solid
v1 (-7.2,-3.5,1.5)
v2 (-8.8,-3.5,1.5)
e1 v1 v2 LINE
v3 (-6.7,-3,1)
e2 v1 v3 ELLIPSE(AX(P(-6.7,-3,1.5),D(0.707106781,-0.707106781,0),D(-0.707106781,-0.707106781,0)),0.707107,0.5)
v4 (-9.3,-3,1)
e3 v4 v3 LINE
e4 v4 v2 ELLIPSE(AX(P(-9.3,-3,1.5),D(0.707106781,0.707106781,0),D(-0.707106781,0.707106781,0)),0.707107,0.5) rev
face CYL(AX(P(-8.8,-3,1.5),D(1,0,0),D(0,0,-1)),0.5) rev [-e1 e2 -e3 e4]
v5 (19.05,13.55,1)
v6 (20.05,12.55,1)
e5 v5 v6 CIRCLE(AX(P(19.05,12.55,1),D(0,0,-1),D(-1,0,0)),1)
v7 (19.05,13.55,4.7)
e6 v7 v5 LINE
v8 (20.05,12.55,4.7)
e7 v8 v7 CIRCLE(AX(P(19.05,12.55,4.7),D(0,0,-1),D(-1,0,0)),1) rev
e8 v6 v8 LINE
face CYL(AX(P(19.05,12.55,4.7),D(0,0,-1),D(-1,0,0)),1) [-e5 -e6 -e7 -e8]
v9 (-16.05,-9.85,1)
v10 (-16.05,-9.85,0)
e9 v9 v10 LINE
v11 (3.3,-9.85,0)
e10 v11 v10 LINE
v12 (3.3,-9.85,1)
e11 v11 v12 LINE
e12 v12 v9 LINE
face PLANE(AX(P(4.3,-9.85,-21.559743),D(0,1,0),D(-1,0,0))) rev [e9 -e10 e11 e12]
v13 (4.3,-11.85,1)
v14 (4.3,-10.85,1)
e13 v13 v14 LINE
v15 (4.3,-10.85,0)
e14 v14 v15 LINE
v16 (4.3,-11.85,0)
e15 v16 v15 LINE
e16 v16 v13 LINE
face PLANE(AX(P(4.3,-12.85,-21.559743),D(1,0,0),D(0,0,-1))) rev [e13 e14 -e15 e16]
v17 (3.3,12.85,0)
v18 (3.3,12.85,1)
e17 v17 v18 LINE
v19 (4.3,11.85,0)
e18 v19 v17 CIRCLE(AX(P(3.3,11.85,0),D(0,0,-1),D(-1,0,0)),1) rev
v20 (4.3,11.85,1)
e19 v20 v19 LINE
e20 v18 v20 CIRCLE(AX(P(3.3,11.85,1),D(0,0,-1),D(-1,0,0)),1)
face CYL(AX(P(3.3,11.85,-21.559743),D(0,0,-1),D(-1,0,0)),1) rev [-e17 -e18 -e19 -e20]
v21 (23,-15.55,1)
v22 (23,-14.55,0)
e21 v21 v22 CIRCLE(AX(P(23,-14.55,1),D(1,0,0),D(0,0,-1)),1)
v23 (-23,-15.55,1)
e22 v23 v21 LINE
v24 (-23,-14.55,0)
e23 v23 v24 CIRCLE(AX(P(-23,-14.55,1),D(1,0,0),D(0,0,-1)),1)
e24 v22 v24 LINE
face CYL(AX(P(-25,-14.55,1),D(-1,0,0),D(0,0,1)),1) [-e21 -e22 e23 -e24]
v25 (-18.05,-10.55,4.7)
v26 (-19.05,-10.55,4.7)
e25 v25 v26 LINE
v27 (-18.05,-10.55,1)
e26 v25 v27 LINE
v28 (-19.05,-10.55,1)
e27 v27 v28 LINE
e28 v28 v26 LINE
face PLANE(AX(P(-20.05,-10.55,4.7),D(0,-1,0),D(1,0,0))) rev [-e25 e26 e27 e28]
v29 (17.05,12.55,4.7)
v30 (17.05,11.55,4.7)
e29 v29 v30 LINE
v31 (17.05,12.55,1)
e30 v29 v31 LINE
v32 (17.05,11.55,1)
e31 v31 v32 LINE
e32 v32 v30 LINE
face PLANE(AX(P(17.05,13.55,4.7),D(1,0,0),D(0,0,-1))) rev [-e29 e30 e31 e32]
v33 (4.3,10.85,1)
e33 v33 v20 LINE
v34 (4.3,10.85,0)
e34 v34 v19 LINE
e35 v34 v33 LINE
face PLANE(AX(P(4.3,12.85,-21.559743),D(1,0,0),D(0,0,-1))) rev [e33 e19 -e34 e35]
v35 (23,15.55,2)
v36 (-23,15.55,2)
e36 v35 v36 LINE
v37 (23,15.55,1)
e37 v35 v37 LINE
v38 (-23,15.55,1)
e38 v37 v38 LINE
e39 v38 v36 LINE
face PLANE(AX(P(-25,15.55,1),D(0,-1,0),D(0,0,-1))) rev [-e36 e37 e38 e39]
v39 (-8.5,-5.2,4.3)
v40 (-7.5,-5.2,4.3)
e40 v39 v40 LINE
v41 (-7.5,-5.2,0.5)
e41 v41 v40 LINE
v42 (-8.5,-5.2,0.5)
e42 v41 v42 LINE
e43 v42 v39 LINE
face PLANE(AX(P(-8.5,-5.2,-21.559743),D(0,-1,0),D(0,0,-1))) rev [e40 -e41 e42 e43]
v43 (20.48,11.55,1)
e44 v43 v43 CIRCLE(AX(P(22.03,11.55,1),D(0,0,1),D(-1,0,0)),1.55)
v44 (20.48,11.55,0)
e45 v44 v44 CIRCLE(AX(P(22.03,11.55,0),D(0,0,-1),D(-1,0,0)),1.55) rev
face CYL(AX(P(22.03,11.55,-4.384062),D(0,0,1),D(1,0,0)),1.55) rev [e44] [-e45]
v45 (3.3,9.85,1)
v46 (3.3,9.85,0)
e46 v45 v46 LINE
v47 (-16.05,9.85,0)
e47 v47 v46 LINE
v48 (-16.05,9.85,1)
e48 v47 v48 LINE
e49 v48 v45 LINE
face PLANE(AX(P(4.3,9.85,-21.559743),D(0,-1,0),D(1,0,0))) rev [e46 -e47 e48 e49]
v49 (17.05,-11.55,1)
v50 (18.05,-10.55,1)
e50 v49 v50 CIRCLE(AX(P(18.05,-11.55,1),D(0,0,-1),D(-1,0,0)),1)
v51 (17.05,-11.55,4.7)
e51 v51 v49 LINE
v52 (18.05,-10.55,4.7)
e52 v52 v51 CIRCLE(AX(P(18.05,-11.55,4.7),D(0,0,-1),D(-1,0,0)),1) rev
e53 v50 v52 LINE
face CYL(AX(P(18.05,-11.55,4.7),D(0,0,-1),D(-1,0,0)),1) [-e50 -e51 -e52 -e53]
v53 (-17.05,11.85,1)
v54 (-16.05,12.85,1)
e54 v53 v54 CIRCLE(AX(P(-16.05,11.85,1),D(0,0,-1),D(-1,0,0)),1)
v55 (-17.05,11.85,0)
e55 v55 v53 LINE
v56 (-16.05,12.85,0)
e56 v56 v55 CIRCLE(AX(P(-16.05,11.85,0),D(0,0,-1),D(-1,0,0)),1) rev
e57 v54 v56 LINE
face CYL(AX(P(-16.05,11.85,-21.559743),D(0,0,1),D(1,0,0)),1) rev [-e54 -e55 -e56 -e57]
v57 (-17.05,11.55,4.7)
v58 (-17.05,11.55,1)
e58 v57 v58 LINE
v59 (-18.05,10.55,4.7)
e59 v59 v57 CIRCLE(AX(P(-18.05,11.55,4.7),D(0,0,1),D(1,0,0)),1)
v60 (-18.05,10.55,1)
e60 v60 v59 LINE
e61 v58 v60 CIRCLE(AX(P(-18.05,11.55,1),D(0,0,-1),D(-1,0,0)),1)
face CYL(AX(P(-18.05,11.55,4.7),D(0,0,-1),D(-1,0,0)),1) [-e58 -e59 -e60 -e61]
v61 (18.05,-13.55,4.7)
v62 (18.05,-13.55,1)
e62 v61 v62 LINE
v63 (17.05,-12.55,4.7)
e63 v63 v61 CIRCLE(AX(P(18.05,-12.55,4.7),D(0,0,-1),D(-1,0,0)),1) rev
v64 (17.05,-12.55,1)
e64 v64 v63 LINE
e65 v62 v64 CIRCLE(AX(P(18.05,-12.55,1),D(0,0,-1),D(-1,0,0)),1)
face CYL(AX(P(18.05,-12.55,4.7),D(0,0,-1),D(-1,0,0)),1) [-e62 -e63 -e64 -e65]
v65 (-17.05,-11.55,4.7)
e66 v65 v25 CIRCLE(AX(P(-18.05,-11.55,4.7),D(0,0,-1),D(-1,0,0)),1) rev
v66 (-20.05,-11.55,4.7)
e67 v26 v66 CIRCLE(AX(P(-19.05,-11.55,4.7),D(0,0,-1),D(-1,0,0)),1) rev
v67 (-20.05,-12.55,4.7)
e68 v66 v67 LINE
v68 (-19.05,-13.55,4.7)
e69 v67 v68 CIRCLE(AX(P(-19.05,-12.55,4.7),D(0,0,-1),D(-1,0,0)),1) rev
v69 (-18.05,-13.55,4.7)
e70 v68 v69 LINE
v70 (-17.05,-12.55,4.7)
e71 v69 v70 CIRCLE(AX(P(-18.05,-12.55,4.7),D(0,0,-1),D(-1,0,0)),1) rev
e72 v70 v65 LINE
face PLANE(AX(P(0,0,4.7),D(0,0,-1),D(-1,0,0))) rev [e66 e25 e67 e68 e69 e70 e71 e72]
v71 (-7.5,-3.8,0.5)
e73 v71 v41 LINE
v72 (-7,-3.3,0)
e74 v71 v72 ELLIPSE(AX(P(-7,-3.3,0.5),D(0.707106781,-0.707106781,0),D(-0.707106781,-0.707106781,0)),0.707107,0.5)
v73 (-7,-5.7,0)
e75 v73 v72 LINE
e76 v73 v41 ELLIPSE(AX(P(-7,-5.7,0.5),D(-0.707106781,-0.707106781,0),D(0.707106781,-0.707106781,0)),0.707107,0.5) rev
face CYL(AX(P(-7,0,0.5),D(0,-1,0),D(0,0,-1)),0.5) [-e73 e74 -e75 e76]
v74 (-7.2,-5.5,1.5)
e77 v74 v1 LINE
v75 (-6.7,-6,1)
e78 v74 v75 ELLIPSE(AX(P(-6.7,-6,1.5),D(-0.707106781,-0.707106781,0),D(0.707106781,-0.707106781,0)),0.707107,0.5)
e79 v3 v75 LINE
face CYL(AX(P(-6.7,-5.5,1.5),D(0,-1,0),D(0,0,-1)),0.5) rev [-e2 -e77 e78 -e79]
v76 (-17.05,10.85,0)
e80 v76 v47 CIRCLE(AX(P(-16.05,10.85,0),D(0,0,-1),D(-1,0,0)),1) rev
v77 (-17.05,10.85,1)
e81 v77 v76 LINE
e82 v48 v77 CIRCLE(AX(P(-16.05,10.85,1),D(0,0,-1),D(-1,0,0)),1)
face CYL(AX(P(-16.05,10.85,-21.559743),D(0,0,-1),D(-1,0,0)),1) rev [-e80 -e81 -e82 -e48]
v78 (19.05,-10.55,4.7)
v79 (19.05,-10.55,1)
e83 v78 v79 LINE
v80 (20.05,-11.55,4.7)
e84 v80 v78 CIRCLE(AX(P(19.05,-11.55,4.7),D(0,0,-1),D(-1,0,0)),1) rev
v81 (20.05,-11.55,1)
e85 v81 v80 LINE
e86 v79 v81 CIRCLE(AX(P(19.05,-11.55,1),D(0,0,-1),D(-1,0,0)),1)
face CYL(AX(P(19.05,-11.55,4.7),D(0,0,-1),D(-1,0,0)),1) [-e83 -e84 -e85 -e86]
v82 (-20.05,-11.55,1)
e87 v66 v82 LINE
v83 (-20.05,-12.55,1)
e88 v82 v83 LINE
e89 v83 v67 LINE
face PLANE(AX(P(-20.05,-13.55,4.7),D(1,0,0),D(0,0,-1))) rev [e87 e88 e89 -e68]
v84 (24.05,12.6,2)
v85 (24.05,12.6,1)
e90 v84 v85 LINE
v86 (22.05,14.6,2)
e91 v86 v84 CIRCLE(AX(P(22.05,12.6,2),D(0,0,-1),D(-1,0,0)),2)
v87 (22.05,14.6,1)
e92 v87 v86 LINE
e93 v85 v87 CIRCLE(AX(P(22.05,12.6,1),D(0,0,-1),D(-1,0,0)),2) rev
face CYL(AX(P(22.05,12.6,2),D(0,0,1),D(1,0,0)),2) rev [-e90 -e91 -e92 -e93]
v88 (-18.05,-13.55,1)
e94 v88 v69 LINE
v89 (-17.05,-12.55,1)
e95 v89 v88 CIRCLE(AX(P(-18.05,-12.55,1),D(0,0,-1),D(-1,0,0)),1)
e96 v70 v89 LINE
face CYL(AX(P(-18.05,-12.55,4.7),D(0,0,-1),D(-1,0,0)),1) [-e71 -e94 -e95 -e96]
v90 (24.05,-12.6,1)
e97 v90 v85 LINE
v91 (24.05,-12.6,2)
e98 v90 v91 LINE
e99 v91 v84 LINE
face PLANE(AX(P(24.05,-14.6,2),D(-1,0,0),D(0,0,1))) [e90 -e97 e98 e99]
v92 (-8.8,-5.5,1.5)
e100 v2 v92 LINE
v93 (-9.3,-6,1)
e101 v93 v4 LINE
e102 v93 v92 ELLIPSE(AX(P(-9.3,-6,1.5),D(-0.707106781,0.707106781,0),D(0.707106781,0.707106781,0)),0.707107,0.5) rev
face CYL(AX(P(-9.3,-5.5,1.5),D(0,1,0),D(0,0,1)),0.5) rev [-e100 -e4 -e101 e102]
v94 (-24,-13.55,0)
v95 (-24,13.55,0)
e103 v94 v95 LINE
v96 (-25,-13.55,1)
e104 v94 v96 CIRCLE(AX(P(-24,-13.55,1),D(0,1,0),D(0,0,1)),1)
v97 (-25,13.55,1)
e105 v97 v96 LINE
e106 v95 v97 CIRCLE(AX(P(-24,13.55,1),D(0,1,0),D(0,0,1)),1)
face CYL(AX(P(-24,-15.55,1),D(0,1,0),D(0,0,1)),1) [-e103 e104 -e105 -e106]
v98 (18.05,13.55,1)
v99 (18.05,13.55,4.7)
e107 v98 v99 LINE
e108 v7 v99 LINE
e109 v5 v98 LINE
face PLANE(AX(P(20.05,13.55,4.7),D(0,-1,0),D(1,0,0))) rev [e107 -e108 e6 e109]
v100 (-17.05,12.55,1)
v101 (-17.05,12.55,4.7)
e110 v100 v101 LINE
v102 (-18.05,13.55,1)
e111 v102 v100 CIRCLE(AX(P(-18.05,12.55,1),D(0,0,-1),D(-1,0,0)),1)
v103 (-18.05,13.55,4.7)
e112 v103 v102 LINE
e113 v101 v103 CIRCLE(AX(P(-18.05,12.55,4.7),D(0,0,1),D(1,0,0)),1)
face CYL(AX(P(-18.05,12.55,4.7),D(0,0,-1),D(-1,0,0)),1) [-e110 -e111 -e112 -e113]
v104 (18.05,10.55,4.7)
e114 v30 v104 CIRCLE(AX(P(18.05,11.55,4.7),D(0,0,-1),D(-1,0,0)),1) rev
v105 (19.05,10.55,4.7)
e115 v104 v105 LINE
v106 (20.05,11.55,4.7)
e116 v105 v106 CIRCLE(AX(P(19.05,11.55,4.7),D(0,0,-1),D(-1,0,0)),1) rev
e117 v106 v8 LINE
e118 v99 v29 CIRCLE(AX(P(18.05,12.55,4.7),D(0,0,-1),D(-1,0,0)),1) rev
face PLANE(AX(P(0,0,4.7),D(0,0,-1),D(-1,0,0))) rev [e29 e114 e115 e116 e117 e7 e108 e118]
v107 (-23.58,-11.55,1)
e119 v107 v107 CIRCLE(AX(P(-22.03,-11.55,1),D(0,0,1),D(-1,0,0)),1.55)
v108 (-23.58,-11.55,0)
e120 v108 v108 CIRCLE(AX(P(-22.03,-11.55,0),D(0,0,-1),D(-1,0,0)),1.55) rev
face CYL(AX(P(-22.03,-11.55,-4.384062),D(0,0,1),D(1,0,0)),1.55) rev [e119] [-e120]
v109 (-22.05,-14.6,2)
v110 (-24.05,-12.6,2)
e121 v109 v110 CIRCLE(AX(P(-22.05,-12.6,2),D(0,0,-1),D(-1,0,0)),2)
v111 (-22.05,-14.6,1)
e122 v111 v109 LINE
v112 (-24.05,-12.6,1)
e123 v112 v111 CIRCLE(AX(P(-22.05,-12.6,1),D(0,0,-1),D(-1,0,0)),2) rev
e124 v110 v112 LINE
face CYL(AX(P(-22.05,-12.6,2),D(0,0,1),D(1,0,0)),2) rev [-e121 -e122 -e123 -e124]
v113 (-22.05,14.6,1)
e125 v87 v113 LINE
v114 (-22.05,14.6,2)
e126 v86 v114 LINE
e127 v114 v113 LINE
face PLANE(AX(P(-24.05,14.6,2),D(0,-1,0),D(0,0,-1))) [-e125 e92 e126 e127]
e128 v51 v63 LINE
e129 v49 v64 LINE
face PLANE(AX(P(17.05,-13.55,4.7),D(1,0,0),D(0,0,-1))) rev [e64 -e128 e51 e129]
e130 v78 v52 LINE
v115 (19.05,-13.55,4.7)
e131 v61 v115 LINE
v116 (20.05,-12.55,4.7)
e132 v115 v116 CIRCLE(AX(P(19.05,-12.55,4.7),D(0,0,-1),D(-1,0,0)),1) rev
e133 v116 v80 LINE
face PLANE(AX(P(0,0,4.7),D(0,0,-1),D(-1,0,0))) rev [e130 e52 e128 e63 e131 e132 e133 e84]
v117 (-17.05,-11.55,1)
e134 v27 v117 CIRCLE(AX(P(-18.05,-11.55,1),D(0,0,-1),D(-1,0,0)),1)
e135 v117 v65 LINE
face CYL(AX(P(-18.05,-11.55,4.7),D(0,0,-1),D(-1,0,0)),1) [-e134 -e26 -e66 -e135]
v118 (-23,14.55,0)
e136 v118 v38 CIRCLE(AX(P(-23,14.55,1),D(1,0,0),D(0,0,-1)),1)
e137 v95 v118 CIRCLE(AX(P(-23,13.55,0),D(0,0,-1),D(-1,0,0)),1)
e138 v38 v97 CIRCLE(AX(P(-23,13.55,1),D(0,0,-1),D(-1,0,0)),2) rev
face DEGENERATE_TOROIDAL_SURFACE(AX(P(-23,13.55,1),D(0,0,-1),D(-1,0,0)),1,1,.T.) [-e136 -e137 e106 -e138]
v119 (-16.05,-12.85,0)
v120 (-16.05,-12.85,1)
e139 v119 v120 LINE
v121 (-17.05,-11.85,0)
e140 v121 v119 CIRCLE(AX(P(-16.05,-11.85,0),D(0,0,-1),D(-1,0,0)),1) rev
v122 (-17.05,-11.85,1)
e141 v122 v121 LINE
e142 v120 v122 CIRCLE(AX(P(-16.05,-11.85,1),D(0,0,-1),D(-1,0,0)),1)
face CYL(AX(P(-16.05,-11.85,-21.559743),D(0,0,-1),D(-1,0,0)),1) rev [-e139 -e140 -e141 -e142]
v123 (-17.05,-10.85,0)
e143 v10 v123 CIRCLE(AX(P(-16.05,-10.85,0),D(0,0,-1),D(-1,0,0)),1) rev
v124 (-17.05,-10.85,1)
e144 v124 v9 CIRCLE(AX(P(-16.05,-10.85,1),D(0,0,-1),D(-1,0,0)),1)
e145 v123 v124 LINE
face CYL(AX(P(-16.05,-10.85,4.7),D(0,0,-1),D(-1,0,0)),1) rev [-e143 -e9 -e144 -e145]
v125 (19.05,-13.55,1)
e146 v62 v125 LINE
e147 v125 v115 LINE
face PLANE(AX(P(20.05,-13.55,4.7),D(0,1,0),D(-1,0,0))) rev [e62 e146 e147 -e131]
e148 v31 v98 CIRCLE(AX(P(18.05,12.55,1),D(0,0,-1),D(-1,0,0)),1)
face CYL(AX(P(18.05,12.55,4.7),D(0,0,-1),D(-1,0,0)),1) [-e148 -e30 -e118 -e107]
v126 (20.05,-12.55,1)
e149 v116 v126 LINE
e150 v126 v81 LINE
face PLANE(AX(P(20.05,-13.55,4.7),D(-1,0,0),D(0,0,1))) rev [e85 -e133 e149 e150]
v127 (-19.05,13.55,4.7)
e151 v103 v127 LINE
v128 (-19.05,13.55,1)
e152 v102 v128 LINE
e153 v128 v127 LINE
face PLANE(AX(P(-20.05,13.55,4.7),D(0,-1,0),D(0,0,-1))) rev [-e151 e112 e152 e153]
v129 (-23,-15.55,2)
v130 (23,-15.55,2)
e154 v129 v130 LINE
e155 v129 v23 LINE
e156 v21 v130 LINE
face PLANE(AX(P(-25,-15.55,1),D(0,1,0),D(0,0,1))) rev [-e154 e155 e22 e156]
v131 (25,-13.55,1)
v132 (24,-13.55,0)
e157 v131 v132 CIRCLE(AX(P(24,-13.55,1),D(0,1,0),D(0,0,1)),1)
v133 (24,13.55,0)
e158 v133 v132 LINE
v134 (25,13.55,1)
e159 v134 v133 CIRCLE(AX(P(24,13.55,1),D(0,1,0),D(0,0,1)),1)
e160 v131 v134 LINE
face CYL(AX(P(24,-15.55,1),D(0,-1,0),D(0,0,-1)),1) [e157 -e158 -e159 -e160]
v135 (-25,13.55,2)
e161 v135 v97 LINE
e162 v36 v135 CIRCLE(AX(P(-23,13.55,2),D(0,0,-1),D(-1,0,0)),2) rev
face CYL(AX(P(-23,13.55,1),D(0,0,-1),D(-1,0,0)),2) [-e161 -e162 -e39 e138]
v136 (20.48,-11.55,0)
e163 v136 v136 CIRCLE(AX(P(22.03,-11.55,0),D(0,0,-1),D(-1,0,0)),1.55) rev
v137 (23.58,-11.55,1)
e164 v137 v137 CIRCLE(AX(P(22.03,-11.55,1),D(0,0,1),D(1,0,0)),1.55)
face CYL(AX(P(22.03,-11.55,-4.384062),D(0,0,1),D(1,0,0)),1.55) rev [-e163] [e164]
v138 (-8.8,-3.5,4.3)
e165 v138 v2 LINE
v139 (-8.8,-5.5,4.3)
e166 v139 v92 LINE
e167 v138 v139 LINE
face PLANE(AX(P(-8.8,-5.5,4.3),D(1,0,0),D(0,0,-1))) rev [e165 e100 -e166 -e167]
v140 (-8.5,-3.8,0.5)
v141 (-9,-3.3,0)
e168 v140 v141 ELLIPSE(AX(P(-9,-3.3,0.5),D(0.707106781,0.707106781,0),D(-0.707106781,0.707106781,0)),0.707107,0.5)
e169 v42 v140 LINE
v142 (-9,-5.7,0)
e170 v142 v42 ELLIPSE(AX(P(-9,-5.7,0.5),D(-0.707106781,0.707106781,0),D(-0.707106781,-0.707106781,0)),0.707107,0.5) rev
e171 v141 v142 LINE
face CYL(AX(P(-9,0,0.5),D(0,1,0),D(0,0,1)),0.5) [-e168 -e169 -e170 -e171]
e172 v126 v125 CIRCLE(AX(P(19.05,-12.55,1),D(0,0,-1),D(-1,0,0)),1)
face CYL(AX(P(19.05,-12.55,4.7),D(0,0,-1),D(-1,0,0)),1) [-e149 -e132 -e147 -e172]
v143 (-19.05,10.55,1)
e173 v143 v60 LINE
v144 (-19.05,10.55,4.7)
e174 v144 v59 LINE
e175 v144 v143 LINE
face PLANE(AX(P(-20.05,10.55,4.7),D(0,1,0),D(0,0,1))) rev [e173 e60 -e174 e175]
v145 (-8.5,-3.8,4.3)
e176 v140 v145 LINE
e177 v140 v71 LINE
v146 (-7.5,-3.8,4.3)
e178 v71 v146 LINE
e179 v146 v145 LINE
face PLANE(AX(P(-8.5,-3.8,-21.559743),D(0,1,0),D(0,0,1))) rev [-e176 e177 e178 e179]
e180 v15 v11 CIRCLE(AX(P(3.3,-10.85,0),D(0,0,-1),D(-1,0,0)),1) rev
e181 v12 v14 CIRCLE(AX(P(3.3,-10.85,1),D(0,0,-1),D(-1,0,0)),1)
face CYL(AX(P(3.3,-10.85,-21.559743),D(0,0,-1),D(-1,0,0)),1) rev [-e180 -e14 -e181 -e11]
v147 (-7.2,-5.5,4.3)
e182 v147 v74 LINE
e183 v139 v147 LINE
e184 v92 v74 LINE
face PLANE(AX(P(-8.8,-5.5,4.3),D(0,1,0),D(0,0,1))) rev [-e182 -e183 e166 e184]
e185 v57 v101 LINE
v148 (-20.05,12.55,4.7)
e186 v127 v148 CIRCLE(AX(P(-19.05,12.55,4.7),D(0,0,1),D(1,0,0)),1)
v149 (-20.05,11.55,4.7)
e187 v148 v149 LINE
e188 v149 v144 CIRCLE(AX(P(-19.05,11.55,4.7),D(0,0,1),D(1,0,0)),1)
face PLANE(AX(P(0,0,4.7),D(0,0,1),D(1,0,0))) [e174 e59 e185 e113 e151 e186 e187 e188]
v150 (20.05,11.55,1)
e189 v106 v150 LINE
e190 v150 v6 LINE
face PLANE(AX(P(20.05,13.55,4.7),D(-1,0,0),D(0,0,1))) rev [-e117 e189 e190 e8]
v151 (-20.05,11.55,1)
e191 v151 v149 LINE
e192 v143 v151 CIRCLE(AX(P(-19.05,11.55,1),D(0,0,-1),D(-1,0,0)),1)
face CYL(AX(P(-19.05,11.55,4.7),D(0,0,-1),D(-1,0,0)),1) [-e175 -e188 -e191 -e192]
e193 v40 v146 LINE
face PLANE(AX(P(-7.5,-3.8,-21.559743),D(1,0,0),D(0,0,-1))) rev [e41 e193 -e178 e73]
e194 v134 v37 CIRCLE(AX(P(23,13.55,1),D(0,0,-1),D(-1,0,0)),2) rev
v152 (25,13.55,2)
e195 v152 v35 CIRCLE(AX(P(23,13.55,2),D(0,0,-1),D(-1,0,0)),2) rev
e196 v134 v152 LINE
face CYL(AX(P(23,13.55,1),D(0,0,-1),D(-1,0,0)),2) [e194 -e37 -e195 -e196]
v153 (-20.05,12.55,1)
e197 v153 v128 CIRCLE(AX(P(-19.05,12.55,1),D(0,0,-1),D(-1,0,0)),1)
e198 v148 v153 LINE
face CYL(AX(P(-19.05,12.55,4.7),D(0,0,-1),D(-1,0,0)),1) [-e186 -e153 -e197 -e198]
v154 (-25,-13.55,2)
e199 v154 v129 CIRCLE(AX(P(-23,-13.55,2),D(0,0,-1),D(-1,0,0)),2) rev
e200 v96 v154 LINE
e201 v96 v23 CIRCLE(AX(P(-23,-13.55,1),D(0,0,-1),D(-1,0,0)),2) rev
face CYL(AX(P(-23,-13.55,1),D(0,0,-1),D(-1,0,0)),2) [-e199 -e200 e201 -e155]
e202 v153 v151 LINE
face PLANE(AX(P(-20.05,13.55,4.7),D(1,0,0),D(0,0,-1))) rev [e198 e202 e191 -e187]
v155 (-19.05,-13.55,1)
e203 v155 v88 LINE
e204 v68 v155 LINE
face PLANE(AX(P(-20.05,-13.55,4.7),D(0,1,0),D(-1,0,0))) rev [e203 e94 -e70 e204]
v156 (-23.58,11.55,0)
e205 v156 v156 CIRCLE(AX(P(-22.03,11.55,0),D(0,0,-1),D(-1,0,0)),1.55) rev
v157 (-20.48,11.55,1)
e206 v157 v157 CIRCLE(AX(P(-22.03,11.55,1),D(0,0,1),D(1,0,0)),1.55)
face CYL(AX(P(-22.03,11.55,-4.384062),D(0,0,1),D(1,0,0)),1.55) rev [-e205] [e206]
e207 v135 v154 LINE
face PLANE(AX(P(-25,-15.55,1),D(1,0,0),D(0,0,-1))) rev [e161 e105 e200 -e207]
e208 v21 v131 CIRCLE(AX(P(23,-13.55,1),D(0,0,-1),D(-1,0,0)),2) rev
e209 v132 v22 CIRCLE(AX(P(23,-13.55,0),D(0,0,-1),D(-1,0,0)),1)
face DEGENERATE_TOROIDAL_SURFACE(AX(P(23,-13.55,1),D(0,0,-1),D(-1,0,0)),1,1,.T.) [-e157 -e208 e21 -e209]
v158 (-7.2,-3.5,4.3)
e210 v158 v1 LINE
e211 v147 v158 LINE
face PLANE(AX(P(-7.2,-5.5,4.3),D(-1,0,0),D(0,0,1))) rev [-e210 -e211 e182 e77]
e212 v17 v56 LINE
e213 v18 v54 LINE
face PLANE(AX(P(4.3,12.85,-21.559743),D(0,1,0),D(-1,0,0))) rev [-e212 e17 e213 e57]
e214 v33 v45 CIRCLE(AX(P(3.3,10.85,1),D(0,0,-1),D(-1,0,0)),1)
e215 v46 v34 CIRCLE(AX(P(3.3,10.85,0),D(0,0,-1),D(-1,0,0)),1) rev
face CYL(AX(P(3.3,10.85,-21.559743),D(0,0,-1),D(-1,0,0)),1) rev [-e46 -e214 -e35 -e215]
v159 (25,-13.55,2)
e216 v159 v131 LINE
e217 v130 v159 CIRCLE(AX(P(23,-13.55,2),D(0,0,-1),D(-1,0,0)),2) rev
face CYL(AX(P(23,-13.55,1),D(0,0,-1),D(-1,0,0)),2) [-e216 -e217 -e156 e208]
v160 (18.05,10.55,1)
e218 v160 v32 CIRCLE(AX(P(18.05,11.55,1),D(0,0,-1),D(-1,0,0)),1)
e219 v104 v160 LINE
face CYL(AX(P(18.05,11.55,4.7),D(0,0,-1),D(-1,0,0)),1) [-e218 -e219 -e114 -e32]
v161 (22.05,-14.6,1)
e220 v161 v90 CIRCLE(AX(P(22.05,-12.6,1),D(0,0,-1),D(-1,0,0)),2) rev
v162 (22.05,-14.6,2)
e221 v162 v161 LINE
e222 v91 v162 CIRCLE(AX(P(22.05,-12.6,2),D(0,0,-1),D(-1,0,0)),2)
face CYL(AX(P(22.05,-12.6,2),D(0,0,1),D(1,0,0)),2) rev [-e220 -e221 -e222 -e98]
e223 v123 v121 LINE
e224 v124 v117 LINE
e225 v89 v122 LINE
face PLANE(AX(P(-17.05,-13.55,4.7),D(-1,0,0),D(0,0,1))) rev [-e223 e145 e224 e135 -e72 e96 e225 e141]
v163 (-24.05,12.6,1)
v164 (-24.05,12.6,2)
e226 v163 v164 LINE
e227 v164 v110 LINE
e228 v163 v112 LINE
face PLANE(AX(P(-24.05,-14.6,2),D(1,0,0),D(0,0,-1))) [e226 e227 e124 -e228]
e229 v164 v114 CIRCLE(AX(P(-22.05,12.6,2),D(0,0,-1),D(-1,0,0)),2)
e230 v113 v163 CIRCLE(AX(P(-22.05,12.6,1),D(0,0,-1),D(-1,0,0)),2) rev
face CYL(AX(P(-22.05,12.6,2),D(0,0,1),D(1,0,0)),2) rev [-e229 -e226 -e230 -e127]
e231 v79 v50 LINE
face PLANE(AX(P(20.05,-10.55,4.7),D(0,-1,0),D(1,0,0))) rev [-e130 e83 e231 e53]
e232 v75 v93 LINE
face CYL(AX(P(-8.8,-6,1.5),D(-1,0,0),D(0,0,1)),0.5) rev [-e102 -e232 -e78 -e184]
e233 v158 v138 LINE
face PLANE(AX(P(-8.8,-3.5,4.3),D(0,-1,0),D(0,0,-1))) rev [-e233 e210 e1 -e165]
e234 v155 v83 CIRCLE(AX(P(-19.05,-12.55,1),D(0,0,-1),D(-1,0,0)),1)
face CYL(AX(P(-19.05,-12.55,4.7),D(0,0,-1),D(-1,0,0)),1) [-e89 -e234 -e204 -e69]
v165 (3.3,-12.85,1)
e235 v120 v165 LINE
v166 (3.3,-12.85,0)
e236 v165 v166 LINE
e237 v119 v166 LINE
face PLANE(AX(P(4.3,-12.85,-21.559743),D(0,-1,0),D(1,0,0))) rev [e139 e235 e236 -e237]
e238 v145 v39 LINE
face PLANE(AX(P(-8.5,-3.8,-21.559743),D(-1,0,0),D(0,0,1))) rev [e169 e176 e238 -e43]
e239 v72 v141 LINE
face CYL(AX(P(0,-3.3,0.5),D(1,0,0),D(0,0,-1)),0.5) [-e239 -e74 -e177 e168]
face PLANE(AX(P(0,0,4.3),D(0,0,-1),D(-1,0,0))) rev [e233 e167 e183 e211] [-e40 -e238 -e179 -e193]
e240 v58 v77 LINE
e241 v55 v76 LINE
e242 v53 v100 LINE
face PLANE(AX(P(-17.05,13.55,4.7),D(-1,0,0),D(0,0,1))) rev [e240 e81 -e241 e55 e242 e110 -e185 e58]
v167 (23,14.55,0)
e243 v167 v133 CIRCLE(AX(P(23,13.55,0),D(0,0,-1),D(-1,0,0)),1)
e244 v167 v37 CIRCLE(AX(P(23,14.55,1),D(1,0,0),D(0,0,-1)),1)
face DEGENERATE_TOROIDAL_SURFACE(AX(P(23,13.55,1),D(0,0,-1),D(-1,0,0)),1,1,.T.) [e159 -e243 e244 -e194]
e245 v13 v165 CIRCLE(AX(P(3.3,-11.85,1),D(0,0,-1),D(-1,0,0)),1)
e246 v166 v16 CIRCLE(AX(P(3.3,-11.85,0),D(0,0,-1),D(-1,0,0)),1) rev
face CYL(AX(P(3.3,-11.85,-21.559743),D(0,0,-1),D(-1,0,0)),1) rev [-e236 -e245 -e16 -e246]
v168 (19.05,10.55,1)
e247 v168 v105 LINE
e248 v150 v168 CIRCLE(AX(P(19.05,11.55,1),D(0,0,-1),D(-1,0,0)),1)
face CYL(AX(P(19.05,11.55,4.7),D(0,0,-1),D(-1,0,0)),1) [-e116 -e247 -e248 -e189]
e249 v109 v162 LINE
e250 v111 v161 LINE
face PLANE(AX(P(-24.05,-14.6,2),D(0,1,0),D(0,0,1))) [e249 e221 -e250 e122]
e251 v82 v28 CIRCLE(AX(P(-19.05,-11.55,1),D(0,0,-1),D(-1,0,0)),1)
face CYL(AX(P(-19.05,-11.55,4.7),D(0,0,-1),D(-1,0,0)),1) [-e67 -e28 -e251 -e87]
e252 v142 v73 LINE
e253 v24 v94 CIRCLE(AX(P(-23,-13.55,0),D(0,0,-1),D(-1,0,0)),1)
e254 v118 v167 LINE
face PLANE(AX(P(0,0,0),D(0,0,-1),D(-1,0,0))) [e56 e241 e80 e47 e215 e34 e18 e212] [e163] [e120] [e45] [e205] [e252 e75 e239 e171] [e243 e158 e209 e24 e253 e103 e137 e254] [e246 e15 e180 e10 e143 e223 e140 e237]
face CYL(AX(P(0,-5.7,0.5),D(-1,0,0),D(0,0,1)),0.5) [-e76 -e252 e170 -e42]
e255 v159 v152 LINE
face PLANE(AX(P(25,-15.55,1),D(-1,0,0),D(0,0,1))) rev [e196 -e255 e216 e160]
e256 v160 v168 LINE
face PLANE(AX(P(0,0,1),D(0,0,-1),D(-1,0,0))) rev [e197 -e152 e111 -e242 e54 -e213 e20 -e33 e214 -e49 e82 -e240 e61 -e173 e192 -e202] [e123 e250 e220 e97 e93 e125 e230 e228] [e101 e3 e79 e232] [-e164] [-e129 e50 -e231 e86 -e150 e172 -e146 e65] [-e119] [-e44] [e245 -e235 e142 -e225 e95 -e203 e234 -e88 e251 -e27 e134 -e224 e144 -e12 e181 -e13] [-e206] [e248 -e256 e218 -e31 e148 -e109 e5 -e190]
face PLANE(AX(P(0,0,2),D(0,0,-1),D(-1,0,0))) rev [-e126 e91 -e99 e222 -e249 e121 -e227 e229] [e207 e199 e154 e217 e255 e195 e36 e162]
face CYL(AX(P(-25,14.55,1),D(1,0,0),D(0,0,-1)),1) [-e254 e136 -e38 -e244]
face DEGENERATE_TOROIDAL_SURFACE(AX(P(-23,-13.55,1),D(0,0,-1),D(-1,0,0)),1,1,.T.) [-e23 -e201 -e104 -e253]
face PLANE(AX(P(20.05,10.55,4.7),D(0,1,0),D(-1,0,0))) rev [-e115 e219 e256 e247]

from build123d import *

# Parameters (mm, degrees)
SKETCH1_W           = 50
SKETCH1_H           = 31.1
BOSS_EXTRUDE1_DEPTH = 1
SKETCH2_W           = 50
SKETCH2_H           = 31.1
SKETCH2_W_2         = 48.1
SKETCH2_H_2         = 29.2
BOSS_EXTRUDE2_DEPTH = 1
SKETCH3_W           = 3
SKETCH3_H           = 3
BOSS_EXTRUDE3_DEPTH = 3.7
SKETCH4_R           = 1.55
CUT_EXTRUDE1_DEPTH  = 1
SKETCH5_W           = 21.35
SKETCH5_H           = 3
SKETCH5_W_2         = 1
SKETCH5_H_2         = 1.4
CUT_EXTRUDE2_DEPTH  = 1
SKETCH6_W           = 1.6
SKETCH6_H           = 2
SKETCH6_W_2         = 1
SKETCH6_H_2         = 1.4
BOSS_EXTRUDE4_DEPTH = 3.3
FILLET1_R           = 2
FILLET2_R           = 1
FILLET3_R           = 1
FILLET4_R           = 1
FILLET5_R           = 0.5
FILLET6_R           = 0.5


with BuildPart() as part:
    # Sketch1 → Boss-Extrude1 (new body)
    with BuildSketch(Plane.XY):
        Rectangle(SKETCH1_W, SKETCH1_H)
    extrude(amount=BOSS_EXTRUDE1_DEPTH)

    # Sketch2 → Boss-Extrude2 (add)
    with BuildSketch(Plane.XY.offset(1)):
        Rectangle(SKETCH2_W, SKETCH2_H)
        Rectangle(SKETCH2_W_2, SKETCH2_H_2, mode=Mode.SUBTRACT)
    extrude(amount=BOSS_EXTRUDE2_DEPTH)

    # Sketch3 → Boss-Extrude3 (add)
    with BuildSketch(Plane.XY.offset(1)):
        with Locations((18.55, 12.05)):
            Rectangle(SKETCH3_W, SKETCH3_H)
        with Locations((-18.55, 12.05)):
            Rectangle(SKETCH3_W, SKETCH3_H)
        with Locations((18.55, -12.05)):
            Rectangle(SKETCH3_W, SKETCH3_H)
        with Locations((-18.55, -12.05)):
            Rectangle(SKETCH3_W, SKETCH3_H)
    extrude(amount=BOSS_EXTRUDE3_DEPTH)

    # Sketch4 → Cut-Extrude1 (cut)
    with BuildSketch(Plane.XY.offset(1)):
        with Locations((-22.03, 11.55)):
            Circle(SKETCH4_R)
        with Locations(Location((22.03, 11.55, 0), (0, 0, 180))):
            Circle(SKETCH4_R)
        with Locations(Location((-22.03, -11.55, 0), (0, 0, 180))):
            Circle(SKETCH4_R)
        with Locations((22.03, -11.55)):
            Circle(SKETCH4_R)
    extrude(amount=-CUT_EXTRUDE1_DEPTH, mode=Mode.SUBTRACT)

    # Sketch5 → Cut-Extrude2 (cut)
    with BuildSketch(Plane.XY.offset(1)):
        with Locations((-6.375, 11.35)):
            Rectangle(SKETCH5_W, SKETCH5_H)
        with Locations((-6.375, -11.35)):
            Rectangle(SKETCH5_W, SKETCH5_H)
        with Locations((-8, -4.5)):
            Rectangle(SKETCH5_W_2, SKETCH5_H_2)
    extrude(amount=-CUT_EXTRUDE2_DEPTH, mode=Mode.SUBTRACT)

    # Sketch6 → Boss-Extrude4 (add)
    with BuildSketch(Plane.XY.offset(1)):
        with Locations((-8, -4.5)):
            Rectangle(SKETCH6_W, SKETCH6_H)
        with Locations((-8, -4.5)):
            Rectangle(SKETCH6_W_2, SKETCH6_H_2, mode=Mode.SUBTRACT)
    extrude(amount=BOSS_EXTRUDE4_DEPTH)

    # Fillet1
    fillet1_edges = [part.edges().sort_by_distance(p)[0] for p in [
        (24.05, 14.6, 1.5),
        (-24.05, 14.6, 1.5),
        (-24.05, -14.6, 1.5),
        (24.05, -14.6, 1.5),
        (25, -15.55, 1),
        (-25, -15.55, 1),
        (-25, 15.55, 1),
        (25, 15.55, 1),
    ]]
    fillet(fillet1_edges, radius=FILLET1_R)

    # Fillet2
    fillet2_edges = [part.edges().sort_by_distance(p)[0] for p in [
        (-20.05, -13.55, 2.85),
        (-17.05, -13.55, 2.85),
        (-17.05, -10.55, 2.85),
        (-20.05, -10.55, 2.85),
        (20.05, 13.55, 2.85),
        (17.05, 13.55, 2.85),
        (17.05, 10.55, 2.85),
        (20.05, 10.55, 2.85),
        (-20.05, 10.55, 2.85),
        (-17.05, 10.55, 2.85),
        (-17.05, 13.55, 2.85),
        (20.05, -13.55, 2.85),
        (20.05, -10.55, 2.85),
        (17.05, -10.55, 2.85),
        (17.05, -13.55, 2.85),
        (-20.05, 13.55, 2.85),
    ]]
    fillet(fillet2_edges, radius=FILLET2_R)

    # Fillet3
    fillet3_edges = [part.edges().sort_by_distance(p)[0] for p in [
        (25, 0, 0),
        (0, -15.55, 0),
        (-25, 0, 0),
        (0, 15.55, 0),
        (-24.414213562, 14.964213562, 0),
        (24.414213562, 14.964213562, 0),
        (-24.414213562, -14.964213562, 0),
        (24.414213562, -14.964213562, 0),
    ]]
    fillet(fillet3_edges, radius=FILLET3_R)

    # Fillet4
    # the kernel refuses this fillet: 1 mm, written as the material it adds along each edge
    with BuildSketch(Plane(origin=(4.3, -9.85, 1), x_dir=(-1, 0, 0), z_dir=(0, 0, -1)), Plane(origin=(-17.05, -9.85, 1), x_dir=(0, -1, 0), z_dir=(0, 0, -1)), Plane(origin=(4.3, 12.85, 1), x_dir=(-1, 0, 0), z_dir=(0, 0, -1)), Plane(origin=(4.3, 9.85, 1), x_dir=(0, 1, 0), z_dir=(0, 0, -1))) as fillet4_piece_1:
        with BuildLine():
            CenterArc((FILLET4_R, -FILLET4_R), FILLET4_R, 90, 90)
            Line((0, -FILLET4_R), (0, 0))
            Line((0, 0), (FILLET4_R, 0))
        make_face()
    extrude(amount=1)
    with BuildSketch(Plane(origin=(4.3, -12.85, 1), x_dir=(-1, 0, 0), z_dir=(0, 0, -1)), Plane(origin=(-17.05, 9.85, 1), x_dir=(0, 1, 0), z_dir=(0, 0, -1))) as fillet4_piece_2:
        with BuildLine():
            CenterArc((FILLET4_R, FILLET4_R), FILLET4_R, 180, 90)
            Line((0, FILLET4_R), (0, 0))
            Line((0, 0), (FILLET4_R, 0))
        make_face()
    extrude(amount=1)
    with BuildSketch(Plane(origin=(-17.096060799, -12.85, 0), x_dir=(0.04601201496386327, 0.9989408863786512, 0), z_dir=(0, 0, 1))) as fillet4_piece_3:
        with BuildLine():
            CenterArc((1.047072251, -0.998940886), FILLET4_R, 92.637225371, 90)
            Line((0.048131365, -1.044952901), (-0.051762724, -1.049554103))
            Line((-0.051762724, -1.049554103), (-0.099894089, -0.004601201))
            Line((-0.099894089, -0.004601201), (0.02557896, 0.096673248))
            ThreePointArc((0.02557896, 0.096673248), (0.297200415, 0.067685678), (0.996459035, 0.099894089))
            Line((0.996459035, 0.099894089), (1.001060237, 0))
        make_face()
    extrude(amount=1)
    with BuildSketch(Plane(origin=(-17.096060799, 12.85, 0), x_dir=(1, 0, 0), z_dir=(0, 0, 1))) as fillet4_piece_4:
        with BuildLine():
            CenterArc((1.046060799, -1), FILLET4_R, 90, 90)
            Line((0.046060799, -1), (-0.053939201, -1))
            ThreePointArc((-0.053939201, -1), (-0.053939201, -0.3), (-0.09539392, -0.03))
            Line((-0.09539392, -0.03), (0, 0.1))
            Line((0, 0.1), (1.046060799, 0.1))
            Line((1.046060799, 0.1), (1.046060799, 0))
        make_face()
    extrude(amount=1)

    # Fillet5
    fillet5_edges = [part.edges().sort_by_distance(p)[0] for p in [
        (-7.2, -4.5, 1),
        (-8, -3.5, 1),
        (-8.8, -4.5, 1),
        (-8, -5.5, 1),
    ]]
    fillet(fillet5_edges, radius=FILLET5_R)

    # Fillet6
    fillet6_edges = [part.edges().sort_by_distance(p)[0] for p in [
        (-8, -5.2, 0),
        (-7.5, -4.5, 0),
        (-8, -3.8, 0),
        (-8.5, -4.5, 0),
    ]]
    fillet(fillet6_edges, radius=FILLET6_R)


solid = part.part
